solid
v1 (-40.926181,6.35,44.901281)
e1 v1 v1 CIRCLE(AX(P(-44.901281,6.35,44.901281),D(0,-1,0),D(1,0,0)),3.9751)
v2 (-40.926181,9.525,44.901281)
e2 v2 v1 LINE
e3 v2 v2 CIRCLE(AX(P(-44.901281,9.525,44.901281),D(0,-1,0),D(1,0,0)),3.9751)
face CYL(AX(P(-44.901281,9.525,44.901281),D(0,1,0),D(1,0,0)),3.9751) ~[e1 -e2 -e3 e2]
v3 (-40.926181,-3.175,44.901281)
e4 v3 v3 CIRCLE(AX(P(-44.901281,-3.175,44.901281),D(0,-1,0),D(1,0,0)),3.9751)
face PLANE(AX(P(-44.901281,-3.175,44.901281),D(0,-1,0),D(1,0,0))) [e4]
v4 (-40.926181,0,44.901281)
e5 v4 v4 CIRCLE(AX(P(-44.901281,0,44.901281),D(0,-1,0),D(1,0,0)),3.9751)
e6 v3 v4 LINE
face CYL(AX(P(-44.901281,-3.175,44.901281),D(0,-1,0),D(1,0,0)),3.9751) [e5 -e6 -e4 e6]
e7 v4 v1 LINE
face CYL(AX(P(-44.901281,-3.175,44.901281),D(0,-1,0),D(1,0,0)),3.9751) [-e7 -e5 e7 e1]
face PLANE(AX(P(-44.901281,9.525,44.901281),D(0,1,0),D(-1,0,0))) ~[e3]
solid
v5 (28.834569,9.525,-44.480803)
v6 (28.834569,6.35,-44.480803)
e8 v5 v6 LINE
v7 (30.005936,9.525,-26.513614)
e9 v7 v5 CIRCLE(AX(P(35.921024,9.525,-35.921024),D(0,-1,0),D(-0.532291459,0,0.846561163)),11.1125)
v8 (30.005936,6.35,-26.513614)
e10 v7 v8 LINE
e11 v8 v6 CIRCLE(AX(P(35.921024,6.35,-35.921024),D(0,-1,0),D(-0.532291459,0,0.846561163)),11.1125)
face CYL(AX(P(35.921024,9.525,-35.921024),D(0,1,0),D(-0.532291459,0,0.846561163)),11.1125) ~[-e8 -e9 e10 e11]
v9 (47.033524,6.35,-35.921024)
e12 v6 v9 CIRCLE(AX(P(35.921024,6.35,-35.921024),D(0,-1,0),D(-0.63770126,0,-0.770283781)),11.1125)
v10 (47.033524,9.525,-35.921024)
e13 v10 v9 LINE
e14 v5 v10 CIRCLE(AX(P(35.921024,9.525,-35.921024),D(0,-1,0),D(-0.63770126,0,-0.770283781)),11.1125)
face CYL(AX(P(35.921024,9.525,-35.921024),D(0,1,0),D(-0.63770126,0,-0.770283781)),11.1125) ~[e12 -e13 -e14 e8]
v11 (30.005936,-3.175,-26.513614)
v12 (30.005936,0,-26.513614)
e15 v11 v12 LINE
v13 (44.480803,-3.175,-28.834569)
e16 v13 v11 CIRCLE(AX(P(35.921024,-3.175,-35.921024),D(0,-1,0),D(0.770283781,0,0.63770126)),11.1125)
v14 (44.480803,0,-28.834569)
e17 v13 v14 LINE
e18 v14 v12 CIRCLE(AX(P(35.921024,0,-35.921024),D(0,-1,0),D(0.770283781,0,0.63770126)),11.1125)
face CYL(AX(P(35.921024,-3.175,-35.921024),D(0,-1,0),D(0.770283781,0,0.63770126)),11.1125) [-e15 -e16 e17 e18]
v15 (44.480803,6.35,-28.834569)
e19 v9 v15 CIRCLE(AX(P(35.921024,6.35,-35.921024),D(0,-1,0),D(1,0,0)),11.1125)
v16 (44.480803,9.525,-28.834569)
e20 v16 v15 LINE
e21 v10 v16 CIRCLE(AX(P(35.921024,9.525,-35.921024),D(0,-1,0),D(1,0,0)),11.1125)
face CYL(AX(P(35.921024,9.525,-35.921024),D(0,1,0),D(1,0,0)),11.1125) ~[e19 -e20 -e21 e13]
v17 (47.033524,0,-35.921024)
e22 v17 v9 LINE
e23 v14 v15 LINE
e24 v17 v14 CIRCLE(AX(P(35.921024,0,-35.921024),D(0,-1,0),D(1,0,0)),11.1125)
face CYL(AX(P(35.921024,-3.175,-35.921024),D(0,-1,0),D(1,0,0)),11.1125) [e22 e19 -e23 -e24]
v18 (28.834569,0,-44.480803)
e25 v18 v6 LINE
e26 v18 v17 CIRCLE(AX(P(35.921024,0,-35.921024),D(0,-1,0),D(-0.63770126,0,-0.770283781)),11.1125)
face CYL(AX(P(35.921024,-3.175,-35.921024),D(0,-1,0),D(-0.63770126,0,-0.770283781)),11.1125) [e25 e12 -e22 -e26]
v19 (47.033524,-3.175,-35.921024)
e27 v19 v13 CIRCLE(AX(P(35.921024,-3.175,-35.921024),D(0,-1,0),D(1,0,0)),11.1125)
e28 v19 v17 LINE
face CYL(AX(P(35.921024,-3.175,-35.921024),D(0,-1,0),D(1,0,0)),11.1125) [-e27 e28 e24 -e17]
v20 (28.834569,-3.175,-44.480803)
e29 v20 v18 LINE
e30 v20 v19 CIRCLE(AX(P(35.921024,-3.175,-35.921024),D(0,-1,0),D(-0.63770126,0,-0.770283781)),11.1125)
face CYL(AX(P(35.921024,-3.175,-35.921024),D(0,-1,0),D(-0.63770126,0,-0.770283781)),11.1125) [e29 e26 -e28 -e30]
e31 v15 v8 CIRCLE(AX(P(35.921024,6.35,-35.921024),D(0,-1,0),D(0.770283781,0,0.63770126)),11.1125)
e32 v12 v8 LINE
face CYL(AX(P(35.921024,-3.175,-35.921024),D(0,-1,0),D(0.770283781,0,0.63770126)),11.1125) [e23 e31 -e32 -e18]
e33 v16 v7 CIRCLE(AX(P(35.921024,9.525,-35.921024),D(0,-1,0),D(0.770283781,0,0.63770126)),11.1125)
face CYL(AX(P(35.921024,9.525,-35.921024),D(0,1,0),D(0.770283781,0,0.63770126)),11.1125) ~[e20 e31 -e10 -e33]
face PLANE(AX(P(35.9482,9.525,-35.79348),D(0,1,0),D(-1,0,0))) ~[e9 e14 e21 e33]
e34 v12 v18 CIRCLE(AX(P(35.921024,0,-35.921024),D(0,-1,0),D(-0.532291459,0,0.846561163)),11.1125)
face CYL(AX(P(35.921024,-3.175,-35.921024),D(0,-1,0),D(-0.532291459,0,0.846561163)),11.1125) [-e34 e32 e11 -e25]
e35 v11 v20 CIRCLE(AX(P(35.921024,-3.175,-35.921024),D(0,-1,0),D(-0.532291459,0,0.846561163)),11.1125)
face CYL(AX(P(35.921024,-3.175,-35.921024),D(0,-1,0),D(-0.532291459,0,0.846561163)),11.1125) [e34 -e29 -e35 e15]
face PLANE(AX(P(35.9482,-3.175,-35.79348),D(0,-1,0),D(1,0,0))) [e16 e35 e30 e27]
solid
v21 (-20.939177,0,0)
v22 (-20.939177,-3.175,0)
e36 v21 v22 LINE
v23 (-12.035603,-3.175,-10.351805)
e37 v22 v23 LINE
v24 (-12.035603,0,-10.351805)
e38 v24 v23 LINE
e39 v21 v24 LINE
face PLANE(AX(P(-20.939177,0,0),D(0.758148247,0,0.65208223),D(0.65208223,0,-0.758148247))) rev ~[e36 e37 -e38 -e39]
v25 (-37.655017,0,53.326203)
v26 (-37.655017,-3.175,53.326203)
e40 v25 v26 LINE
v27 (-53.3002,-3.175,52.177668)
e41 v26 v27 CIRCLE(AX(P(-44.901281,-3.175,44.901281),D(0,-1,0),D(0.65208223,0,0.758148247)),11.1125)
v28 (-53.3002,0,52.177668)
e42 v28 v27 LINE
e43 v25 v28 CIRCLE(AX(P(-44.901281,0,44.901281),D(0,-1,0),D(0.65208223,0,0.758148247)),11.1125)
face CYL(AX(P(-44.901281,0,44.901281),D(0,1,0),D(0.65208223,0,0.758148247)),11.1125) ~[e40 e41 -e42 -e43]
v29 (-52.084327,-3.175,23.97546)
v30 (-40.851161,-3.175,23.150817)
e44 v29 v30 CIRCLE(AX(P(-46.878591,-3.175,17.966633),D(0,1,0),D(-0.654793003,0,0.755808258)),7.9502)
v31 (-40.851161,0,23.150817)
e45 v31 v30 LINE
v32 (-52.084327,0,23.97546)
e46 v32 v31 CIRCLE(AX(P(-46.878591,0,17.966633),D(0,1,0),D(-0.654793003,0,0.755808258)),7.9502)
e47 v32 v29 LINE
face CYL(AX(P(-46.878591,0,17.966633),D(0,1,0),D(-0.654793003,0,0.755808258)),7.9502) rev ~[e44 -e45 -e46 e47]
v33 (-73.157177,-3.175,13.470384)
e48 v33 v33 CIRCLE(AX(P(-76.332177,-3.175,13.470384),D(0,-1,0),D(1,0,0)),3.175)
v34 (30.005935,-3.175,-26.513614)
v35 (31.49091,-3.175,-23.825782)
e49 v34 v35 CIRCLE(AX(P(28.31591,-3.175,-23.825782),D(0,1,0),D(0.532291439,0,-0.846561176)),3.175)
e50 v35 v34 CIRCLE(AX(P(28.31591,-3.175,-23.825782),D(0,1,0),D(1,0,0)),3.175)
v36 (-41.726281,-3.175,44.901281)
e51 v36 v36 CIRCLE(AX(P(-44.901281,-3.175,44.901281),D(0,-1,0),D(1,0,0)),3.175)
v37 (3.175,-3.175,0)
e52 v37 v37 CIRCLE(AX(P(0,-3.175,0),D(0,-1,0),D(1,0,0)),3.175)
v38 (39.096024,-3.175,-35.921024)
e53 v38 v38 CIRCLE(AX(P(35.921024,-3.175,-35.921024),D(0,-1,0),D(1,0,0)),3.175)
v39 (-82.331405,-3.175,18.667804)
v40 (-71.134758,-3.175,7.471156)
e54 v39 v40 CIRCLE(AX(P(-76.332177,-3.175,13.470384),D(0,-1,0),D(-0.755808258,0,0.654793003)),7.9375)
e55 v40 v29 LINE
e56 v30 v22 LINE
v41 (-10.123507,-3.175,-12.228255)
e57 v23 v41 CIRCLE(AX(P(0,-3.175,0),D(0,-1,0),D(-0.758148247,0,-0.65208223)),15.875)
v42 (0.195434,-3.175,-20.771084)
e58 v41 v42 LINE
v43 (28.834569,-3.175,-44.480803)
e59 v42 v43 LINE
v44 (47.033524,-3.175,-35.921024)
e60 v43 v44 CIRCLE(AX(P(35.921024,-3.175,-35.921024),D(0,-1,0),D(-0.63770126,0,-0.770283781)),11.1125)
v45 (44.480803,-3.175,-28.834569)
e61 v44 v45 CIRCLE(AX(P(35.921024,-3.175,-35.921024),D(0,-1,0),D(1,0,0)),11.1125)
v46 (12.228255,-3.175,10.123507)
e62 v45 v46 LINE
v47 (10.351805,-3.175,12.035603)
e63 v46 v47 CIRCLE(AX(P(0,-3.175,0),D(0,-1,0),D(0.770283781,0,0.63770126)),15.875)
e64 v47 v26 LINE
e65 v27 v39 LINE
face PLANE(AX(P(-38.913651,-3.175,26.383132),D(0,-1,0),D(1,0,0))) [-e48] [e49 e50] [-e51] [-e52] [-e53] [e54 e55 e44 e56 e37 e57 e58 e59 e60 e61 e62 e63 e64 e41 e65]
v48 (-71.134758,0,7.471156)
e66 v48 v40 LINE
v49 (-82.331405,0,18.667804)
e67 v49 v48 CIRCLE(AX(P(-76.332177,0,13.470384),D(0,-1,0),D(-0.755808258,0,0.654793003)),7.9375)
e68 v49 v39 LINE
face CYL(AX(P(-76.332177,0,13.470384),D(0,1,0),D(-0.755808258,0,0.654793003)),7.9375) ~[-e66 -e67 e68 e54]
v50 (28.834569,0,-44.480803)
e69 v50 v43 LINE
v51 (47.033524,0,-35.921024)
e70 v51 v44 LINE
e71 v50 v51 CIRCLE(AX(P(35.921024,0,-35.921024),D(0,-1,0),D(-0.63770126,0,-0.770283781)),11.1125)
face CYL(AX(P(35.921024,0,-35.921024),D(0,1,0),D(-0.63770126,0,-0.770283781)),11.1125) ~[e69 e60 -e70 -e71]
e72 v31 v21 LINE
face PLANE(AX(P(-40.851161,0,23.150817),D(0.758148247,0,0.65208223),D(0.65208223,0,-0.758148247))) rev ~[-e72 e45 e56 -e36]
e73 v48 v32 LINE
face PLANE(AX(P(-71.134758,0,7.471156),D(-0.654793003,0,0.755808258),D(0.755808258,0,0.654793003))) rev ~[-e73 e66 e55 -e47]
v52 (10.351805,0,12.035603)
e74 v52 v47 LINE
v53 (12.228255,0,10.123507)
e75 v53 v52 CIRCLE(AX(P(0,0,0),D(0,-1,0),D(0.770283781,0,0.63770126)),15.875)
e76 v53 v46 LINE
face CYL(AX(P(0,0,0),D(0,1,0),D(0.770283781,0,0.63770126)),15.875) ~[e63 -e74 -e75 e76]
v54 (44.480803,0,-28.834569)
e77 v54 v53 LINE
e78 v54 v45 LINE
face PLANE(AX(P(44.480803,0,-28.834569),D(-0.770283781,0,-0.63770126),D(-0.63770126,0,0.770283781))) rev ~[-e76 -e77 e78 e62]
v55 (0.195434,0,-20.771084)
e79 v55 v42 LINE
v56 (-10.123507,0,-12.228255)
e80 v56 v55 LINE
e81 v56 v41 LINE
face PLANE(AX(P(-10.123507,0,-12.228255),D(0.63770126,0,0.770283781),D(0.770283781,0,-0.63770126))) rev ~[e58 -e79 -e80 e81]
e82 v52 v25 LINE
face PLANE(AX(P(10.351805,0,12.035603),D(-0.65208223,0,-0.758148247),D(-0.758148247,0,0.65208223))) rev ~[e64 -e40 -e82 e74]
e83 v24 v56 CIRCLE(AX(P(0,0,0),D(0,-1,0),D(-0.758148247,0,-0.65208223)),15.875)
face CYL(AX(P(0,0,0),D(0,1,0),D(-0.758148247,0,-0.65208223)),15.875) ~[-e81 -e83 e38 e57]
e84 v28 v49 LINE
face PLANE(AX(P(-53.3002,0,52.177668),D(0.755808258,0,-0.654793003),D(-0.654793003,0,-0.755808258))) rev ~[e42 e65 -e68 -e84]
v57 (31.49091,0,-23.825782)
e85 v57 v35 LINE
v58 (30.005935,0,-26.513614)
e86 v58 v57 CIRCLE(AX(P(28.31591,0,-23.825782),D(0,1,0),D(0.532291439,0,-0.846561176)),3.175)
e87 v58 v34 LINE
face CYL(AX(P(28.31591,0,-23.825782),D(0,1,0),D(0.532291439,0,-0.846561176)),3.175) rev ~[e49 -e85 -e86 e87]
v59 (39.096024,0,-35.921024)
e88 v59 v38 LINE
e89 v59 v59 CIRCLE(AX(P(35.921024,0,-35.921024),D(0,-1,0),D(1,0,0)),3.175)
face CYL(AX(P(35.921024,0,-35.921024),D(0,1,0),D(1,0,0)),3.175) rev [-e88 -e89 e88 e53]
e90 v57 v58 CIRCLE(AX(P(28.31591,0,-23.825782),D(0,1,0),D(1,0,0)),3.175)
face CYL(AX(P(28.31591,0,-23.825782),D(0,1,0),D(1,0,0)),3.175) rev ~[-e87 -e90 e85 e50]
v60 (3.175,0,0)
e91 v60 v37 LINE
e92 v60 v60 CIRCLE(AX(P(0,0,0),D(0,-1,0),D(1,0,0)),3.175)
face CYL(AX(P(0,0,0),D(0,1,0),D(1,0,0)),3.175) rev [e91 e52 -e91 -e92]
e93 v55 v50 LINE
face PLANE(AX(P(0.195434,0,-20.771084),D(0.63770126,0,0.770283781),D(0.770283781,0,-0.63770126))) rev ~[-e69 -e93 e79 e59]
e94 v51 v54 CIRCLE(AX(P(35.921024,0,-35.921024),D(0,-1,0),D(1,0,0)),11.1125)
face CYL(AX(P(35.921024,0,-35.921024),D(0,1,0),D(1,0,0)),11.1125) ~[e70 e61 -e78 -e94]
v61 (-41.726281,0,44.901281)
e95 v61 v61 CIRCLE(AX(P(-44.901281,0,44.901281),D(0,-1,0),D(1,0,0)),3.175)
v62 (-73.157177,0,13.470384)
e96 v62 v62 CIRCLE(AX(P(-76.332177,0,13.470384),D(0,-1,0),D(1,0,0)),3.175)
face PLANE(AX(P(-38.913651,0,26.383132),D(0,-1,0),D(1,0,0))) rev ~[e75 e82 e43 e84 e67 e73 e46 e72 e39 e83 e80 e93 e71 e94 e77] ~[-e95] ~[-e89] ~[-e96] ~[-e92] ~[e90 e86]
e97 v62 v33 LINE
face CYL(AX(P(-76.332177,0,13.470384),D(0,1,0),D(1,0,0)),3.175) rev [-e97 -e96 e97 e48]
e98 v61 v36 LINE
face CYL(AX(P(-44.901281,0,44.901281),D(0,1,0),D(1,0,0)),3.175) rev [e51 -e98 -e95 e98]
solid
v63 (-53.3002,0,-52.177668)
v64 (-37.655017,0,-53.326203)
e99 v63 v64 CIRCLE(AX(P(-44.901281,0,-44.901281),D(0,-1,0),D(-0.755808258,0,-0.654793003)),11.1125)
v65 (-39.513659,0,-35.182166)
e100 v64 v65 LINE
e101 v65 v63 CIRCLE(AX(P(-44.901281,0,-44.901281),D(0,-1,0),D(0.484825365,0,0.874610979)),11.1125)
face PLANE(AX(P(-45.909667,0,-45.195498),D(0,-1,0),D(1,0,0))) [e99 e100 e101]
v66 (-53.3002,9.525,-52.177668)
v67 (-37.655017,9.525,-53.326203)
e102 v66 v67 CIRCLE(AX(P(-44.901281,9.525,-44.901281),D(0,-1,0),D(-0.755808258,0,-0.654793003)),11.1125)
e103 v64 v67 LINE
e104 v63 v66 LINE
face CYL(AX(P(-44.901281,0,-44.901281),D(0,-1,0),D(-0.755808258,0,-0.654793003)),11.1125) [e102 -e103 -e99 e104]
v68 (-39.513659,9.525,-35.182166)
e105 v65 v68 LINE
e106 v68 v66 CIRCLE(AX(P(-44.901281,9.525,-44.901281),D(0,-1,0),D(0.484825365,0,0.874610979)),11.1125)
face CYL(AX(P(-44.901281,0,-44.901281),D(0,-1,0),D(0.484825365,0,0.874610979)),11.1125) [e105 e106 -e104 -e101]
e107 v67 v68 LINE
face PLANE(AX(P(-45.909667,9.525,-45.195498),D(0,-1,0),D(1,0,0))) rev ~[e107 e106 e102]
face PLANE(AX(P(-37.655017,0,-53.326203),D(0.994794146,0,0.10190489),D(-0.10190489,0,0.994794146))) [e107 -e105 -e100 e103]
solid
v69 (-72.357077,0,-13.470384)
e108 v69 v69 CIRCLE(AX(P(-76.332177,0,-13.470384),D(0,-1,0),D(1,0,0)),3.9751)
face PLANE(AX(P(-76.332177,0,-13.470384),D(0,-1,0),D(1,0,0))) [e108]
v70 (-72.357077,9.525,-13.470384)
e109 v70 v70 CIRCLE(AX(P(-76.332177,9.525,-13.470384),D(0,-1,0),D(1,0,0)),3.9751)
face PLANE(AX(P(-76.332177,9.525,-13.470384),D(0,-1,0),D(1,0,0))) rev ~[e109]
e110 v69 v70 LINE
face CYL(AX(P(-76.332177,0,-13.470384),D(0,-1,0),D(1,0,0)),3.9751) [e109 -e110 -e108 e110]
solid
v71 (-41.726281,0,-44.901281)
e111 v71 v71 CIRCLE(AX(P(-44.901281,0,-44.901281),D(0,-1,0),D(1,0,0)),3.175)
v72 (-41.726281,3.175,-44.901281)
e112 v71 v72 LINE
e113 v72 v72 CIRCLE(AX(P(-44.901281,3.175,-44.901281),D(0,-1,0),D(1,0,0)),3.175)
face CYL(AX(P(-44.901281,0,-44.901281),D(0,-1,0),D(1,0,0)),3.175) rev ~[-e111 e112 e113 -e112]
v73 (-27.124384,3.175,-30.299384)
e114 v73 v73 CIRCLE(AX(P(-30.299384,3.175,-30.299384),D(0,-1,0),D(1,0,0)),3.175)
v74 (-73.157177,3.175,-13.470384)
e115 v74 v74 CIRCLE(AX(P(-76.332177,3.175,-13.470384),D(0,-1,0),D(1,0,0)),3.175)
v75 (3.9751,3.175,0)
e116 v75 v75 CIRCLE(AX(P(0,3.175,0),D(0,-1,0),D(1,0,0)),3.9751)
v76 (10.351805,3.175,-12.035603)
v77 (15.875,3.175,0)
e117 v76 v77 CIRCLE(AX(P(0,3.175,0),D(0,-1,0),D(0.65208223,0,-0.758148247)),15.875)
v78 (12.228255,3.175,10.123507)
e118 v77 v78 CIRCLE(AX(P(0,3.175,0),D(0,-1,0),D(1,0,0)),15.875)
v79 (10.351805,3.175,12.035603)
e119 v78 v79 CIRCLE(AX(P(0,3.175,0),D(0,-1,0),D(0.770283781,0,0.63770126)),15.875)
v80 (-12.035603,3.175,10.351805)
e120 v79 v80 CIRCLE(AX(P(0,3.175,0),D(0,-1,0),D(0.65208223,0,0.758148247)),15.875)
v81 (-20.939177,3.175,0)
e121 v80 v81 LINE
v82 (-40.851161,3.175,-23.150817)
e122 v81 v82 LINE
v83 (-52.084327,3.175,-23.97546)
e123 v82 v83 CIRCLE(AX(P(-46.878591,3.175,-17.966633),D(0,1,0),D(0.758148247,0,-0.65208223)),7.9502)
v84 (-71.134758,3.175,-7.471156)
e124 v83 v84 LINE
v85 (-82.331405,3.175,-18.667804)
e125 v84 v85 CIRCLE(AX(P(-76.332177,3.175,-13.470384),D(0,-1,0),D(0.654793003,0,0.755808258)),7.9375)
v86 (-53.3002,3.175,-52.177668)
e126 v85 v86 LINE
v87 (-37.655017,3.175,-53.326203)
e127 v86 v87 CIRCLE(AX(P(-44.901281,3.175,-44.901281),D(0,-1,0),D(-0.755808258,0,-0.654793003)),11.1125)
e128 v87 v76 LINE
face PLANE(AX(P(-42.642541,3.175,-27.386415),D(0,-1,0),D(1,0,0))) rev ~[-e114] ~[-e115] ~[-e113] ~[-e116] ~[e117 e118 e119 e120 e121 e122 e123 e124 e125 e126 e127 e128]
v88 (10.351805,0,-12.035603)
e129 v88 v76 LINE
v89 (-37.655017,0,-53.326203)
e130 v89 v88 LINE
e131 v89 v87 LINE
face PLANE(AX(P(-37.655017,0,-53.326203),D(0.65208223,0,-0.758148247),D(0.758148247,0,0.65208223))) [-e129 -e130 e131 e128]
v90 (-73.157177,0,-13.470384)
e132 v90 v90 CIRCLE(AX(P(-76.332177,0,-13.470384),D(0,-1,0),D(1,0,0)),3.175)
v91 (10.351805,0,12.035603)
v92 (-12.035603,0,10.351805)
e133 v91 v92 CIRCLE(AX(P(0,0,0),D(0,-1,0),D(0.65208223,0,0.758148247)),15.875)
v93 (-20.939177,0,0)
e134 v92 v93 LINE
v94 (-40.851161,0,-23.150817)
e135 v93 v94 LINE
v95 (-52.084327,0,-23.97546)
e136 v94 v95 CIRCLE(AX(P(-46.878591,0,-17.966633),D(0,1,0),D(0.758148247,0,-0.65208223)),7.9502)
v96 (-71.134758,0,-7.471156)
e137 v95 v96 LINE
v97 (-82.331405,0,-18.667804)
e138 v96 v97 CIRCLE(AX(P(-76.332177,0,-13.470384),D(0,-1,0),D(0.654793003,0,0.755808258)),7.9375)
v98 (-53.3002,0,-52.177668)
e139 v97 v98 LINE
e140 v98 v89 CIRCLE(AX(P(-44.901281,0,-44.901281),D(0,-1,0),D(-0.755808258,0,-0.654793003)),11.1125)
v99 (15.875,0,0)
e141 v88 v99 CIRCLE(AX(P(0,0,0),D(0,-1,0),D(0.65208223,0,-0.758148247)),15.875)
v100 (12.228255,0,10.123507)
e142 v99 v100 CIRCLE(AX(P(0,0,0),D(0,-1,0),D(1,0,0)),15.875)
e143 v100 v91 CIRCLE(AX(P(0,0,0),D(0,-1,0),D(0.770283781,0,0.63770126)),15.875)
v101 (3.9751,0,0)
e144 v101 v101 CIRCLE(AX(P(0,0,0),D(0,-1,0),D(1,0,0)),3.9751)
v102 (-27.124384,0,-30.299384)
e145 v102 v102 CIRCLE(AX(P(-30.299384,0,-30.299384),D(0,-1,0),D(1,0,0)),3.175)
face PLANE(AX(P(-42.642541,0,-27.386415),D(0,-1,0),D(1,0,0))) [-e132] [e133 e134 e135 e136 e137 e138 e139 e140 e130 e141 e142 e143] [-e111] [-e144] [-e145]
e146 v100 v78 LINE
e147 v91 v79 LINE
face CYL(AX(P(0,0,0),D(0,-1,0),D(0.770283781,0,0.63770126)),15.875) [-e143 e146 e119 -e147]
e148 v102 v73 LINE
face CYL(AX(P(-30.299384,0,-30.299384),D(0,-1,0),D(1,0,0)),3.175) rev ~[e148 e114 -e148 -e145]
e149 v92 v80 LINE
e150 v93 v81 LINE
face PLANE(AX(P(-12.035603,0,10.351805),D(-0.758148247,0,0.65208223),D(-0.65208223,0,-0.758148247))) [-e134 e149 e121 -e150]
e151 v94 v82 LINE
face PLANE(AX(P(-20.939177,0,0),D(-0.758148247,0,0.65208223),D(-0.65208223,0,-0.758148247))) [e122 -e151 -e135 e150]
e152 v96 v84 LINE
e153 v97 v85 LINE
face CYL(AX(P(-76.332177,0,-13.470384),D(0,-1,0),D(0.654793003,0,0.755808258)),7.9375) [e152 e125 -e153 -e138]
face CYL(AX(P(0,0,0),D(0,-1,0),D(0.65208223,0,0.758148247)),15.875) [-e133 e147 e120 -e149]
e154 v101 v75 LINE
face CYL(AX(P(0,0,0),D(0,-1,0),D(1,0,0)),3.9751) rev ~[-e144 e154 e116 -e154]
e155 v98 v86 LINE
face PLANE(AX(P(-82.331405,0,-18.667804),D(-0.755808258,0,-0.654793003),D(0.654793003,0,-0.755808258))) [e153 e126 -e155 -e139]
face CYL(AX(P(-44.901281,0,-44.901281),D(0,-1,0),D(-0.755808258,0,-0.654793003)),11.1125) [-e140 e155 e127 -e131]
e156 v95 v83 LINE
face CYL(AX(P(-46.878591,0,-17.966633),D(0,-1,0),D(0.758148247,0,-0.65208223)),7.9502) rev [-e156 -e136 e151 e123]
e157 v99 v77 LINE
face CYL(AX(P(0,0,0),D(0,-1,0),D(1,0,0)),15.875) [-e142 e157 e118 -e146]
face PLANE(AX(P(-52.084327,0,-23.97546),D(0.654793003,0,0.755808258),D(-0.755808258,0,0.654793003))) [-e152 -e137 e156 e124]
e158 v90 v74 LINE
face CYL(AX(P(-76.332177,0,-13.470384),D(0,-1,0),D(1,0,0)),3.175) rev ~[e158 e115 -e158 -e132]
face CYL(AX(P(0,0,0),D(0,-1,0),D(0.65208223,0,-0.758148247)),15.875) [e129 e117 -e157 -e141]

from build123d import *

# Parameters (mm, degrees)
F0_R     = 3.175
F0_R_2   = 3.9751
F1_DEPTH = 3.175
F2_DEPTH = 3.175
F4_R     = 3.175
F6_DEPTH = 9.525
F4_R_2   = 3.9751
F3_R     = 3.175
F3_R_2   = 3.9751


# Not quite as in the source:
# - a pattern or mirror of a feature is missing from the dataset's text; its kind, count and spacing are read off the source's solid


with BuildPart() as f1:
    # F0 (on Front) → F1 (new body)
    with BuildSketch(Plane.XZ):
        with BuildLine():
            ThreePointArc((-12.0356034274, 10.3518054047), (-1.190625, 15.8302885984), (10.3518054047, 12.0356034274))
            Line((10.3518054047, 12.0356034274), (-37.655016822, 53.3262030046))
            ThreePointArc((-37.655016822, 53.3262030046), (-34.8014845049, 49.5361241819), (-33.7887806053, 44.9012806053))
            ThreePointArc((-33.7887806053, 44.9012806053), (-48.7842347585, 34.4892527868), (-53.300199871, 52.1776678558))
            Line((-53.300199871, 52.1776678558), (-82.331405076, 18.6678036462))
            ThreePointArc((-82.331405076, 18.6678036462), (-73.5586383483, 20.9075469092), (-68.3946770291, 13.4703841816))
            ThreePointArc((-68.3946770291, 13.4703841816), (-69.1121208226, 10.1727039932), (-71.1347575644, 7.4711561347))
            Line((-71.1347575644, 7.4711561347), (-52.0843267669, 23.9754595323))
            ThreePointArc((-52.0843267669, 23.9754595323), (-46.2965222838, 25.8954961667), (-40.8511612346, 23.1508168672))
            Line((-40.8511612346, 23.1508168672), (-20.9391765456, 0))
            Line((-20.9391765456, 0), (-12.0356034274, 10.3518054047))
        make_face()
        with BuildLine():
            ThreePointArc((-68.3946770291, 13.4703841816), (-73.5586383483, 20.9075469092), (-82.331405076, 18.6678036462))
            ThreePointArc((-82.331405076, 18.6678036462), (-81.9448371048, 7.8577241059), (-71.1347575644, 7.4711561347))
            ThreePointArc((-71.1347575644, 7.4711561347), (-69.1121208226, 10.1727039932), (-68.3946770291, 13.4703841816))
        make_face()
        with Locations((-76.3321770291, 13.4703841816)):
            Circle(F0_R, mode=Mode.SUBTRACT)
        with BuildLine():
            ThreePointArc((-33.7887806053, 44.9012806053), (-34.8014845049, 49.5361241819), (-37.655016822, 53.3262030046))
            ThreePointArc((-37.655016822, 53.3262030046), (-45.7148756595, 55.9839571475), (-53.300199871, 52.1776678558))
            ThreePointArc((-53.300199871, 52.1776678558), (-48.7842347585, 34.4892527868), (-33.7887806053, 44.9012806053))
        make_face()
        with Locations((-44.9012806053, 44.9012806053)):
            Circle(F0_R, mode=Mode.SUBTRACT)
        with BuildLine():
            ThreePointArc((10.3518054047, -12.0356034274), (14.4282801435, -6.6212051093), (15.875, 0))
            ThreePointArc((15.875, 0), (14.9355142785, 5.3801522504), (12.2282550252, 10.1235074968))
            ThreePointArc((12.2282550252, 10.1235074968), (11.3304373246, 11.1192092809), (10.3518054047, 12.0356034274))
            ThreePointArc((10.3518054047, 12.0356034274), (-1.190625, 15.8302885984), (-12.0356034274, 10.3518054047))
            ThreePointArc((-12.0356034274, 10.3518054047), (-15.875, 0), (-12.0356034274, -10.3518054047))
            ThreePointArc((-12.0356034274, -10.3518054047), (-11.1192092809, -11.3304373246), (-10.1235074968, -12.2282550252))
            ThreePointArc((-10.1235074968, -12.2282550252), (0.1493607821, -15.87429735), (10.3518054047, -12.0356034274))
        make_face()
        Circle(F0_R_2, mode=Mode.SUBTRACT)
        with BuildLine():
            Line((0.1954344954, -20.7710836138), (10.3518054047, -12.0356034274))
            ThreePointArc((10.3518054047, -12.0356034274), (0.1493607821, -15.87429735), (-10.1235074968, -12.2282550252))
            Line((-10.1235074968, -12.2282550252), (0.1954344954, -20.7710836138))
        make_face()
        with BuildLine():
            ThreePointArc((-12.0356034274, -10.3518054047), (-15.875, 0), (-12.0356034274, 10.3518054047))
            Line((-12.0356034274, 10.3518054047), (-20.9391765456, 0))
            Line((-20.9391765456, 0), (-12.0356034274, -10.3518054047))
        make_face()
        with BuildLine():
            ThreePointArc((12.2282550252, 10.1235074968), (14.9355142785, 5.3801522504), (15.875, 0))
            ThreePointArc((15.875, 0), (14.4282801435, -6.6212051093), (10.3518054047, -12.0356034274))
            Line((10.3518054047, -12.0356034274), (0.1954344954, -20.7710836138))
            Line((0.1954344954, -20.7710836138), (28.8345692365, -44.4808030019))
            ThreePointArc((28.8345692365, -44.4808030019), (24.8320654939, -35.1980827435), (30.0059353765, -26.5136137301))
            ThreePointArc((30.0059353765, -26.5136137301), (37.6803721288, -24.9486796066), (44.4808030019, -28.8345692365))
            Line((44.4808030019, -28.8345692365), (12.2282550252, 10.1235074968))
        make_face()
        with BuildLine():
            ThreePointArc((31.490910058, -23.8257819975), (31.0949796313, -25.361163809), (30.0059353765, -26.5136137301))
            ThreePointArc((30.0059353765, -26.5136137301), (25.5368404848, -22.290400186), (31.490910058, -23.8257819975))
        make_face(mode=Mode.SUBTRACT)
        with BuildLine():
            ThreePointArc((47.0335244843, -35.9210244843), (46.3758844792, -32.154917909), (44.4808030019, -28.8345692365))
            ThreePointArc((44.4808030019, -28.8345692365), (37.6803721288, -24.9486796066), (30.0059353765, -26.5136137301))
            ThreePointArc((30.0059353765, -26.5136137301), (24.8320654939, -35.1980827435), (28.8345692365, -44.4808030019))
            ThreePointArc((28.8345692365, -44.4808030019), (40.650687385, -45.9767663811), (47.0335244843, -35.9210244843))
        make_face()
        with Locations((35.9210244843, -35.9210244843)):
            Circle(F0_R, mode=Mode.SUBTRACT)
        Circle(F0_R_2)
        Circle(F0_R, mode=Mode.SUBTRACT)
    extrude(amount=F1_DEPTH)


with BuildPart() as f2:
    # F0 (on Front) → F2 (new body)
    with BuildSketch(Plane.XZ):
        with BuildLine():
            Line((0.1954344954, -20.7710836138), (-10.1235074968, -12.2282550252))
            ThreePointArc((-10.1235074968, -12.2282550252), (-11.1192092809, -11.3304373246), (-12.0356034274, -10.3518054047))
            Line((-12.0356034274, -10.3518054047), (-20.9391765456, 0))
            Line((-20.9391765456, 0), (-40.8511612346, -23.1508168672))
            ThreePointArc((-40.8511612346, -23.1508168672), (-46.2965222838, -25.8954961667), (-52.0843267669, -23.9754595323))
            Line((-52.0843267669, -23.9754595323), (-71.1347575644, -7.4711561347))
            ThreePointArc((-71.1347575644, -7.4711561347), (-69.1121208226, -10.1727039932), (-68.3946770291, -13.4703841816))
            ThreePointArc((-68.3946770291, -13.4703841816), (-73.5586383483, -20.9075469092), (-82.331405076, -18.6678036462))
            Line((-82.331405076, -18.6678036462), (-53.300199871, -52.1776678558))
            ThreePointArc((-53.300199871, -52.1776678558), (-48.7842347585, -34.4892527868), (-33.7887806053, -44.9012806053))
            ThreePointArc((-33.7887806053, -44.9012806053), (-34.8014845049, -49.5361241819), (-37.655016822, -53.3262030046))
            Line((-37.655016822, -53.3262030046), (0.1954344954, -20.7710836138))
        make_face()
        with Locations((-30.2993841525, -30.2993841525)):
            Circle(F0_R, mode=Mode.SUBTRACT)
        with BuildLine():
            ThreePointArc((-53.300199871, -52.1776678558), (-45.7148756595, -55.9839571475), (-37.655016822, -53.3262030046))
            ThreePointArc((-37.655016822, -53.3262030046), (-34.8014845049, -49.5361241819), (-33.7887806053, -44.9012806053))
            ThreePointArc((-33.7887806053, -44.9012806053), (-48.7842347585, -34.4892527868), (-53.300199871, -52.1776678558))
        make_face()
        with Locations((-44.9012806053, -44.9012806053)):
            Circle(F0_R, mode=Mode.SUBTRACT)
        with BuildLine():
            ThreePointArc((-71.1347575644, -7.4711561347), (-81.9448371048, -7.8577241059), (-82.331405076, -18.6678036462))
            ThreePointArc((-82.331405076, -18.6678036462), (-73.5586383483, -20.9075469092), (-68.3946770291, -13.4703841816))
            ThreePointArc((-68.3946770291, -13.4703841816), (-69.1121208226, -10.1727039932), (-71.1347575644, -7.4711561347))
        make_face()
        with Locations((-76.3321770291, -13.4703841816)):
            Circle(F0_R, mode=Mode.SUBTRACT)
        with BuildLine():
            ThreePointArc((-12.0356034274, -10.3518054047), (-15.875, 0), (-12.0356034274, 10.3518054047))
            Line((-12.0356034274, 10.3518054047), (-20.9391765456, 0))
            Line((-20.9391765456, 0), (-12.0356034274, -10.3518054047))
        make_face()
        with BuildLine():
            Line((0.1954344954, -20.7710836138), (10.3518054047, -12.0356034274))
            ThreePointArc((10.3518054047, -12.0356034274), (0.1493607821, -15.87429735), (-10.1235074968, -12.2282550252))
            Line((-10.1235074968, -12.2282550252), (0.1954344954, -20.7710836138))
        make_face()
        with BuildLine():
            ThreePointArc((10.3518054047, -12.0356034274), (14.4282801435, -6.6212051093), (15.875, 0))
            ThreePointArc((15.875, 0), (14.9355142785, 5.3801522504), (12.2282550252, 10.1235074968))
            ThreePointArc((12.2282550252, 10.1235074968), (11.3304373246, 11.1192092809), (10.3518054047, 12.0356034274))
            ThreePointArc((10.3518054047, 12.0356034274), (-1.190625, 15.8302885984), (-12.0356034274, 10.3518054047))
            ThreePointArc((-12.0356034274, 10.3518054047), (-15.875, 0), (-12.0356034274, -10.3518054047))
            ThreePointArc((-12.0356034274, -10.3518054047), (-11.1192092809, -11.3304373246), (-10.1235074968, -12.2282550252))
            ThreePointArc((-10.1235074968, -12.2282550252), (0.1493607821, -15.87429735), (10.3518054047, -12.0356034274))
        make_face()
        Circle(F0_R_2, mode=Mode.SUBTRACT)
    extrude(amount=-F2_DEPTH)


with BuildPart() as f6:
    # F4 (on face) → F6 (new body, through all)
    with BuildSketch(Plane.XZ):
        with BuildLine():
            Line((-37.655016822, -53.3262030046), (-39.5136587319, -35.1821660984))
            ThreePointArc((-39.5136587319, -35.1821660984), (-53.5313876726, -37.9006443302), (-53.300199871, -52.1776678558))
            ThreePointArc((-53.300199871, -52.1776678558), (-45.7148756595, -55.9839571475), (-37.655016822, -53.3262030046))
        make_face()
        with Locations((-44.9012806053, -44.9012806053)):
            Circle(F4_R, mode=Mode.SUBTRACT)
        with Locations((-44.9012806053, -44.9012806053)):
            Circle(F4_R)
    extrude(amount=-F6_DEPTH)


with BuildPart() as f6b:
    # F4 (on face) → F6, piece 2 (new body, through all)
    with BuildSketch(Plane.XZ):
        with Locations((-76.3321770291, -13.4703841816)):
            Circle(F4_R_2)
        with Locations((-76.3321770291, -13.4703841816)):
            Circle(F4_R, mode=Mode.SUBTRACT)
        with Locations((-76.3321770291, -13.4703841816)):
            Circle(F4_R)
    extrude(amount=-F6_DEPTH)


with BuildPart() as f6c:
    # F3 (on face) → F6, piece 3 (new body, through all)
    with BuildSketch(Plane.XZ.offset(3.175)):
        with BuildLine():
            ThreePointArc((28.8345692365, -44.4808030019), (40.650687385, -45.9767663811), (47.0335244843, -35.9210244843))
            ThreePointArc((47.0335244843, -35.9210244843), (46.3758844792, -32.154917909), (44.4808030019, -28.8345692365))
            ThreePointArc((44.4808030019, -28.8345692365), (37.6803722871, -24.9486796319), (30.005935648, -26.5136135595))
            ThreePointArc((30.005935648, -26.5136135595), (24.8320655044, -35.1980825835), (28.8345692365, -44.4808030019))
        make_face()
        with Locations((35.9210244843, -35.9210244843)):
            Circle(F3_R, mode=Mode.SUBTRACT)
        with Locations((35.9210244843, -35.9210244843)):
            Circle(F3_R)
    extrude(amount=-F6_DEPTH)

    # F6_3_copies: F6c across plane


with BuildPart() as f6d:
    # F3 (on face) → F6, piece 4 (new body, through all)
    with BuildSketch(Plane.XZ.offset(3.175)):
        with Locations((-44.9012806053, 44.9012806053)):
            Circle(F3_R_2)
        with Locations((-44.9012806053, 44.9012806053)):
            Circle(F3_R, mode=Mode.SUBTRACT)
        with Locations((-44.9012806053, 44.9012806053)):
            Circle(F3_R)
    extrude(amount=-F6_DEPTH)

    # F6_4_copies: F6d across plane


with BuildPart() as f6c_1:
    add(f6c.part)
    add(f6c.part.mirror(Plane.ZX.offset(3.175)))


with BuildPart() as f6d_1:
    add(f6d.part)
    add(f6d.part.mirror(Plane.ZX.offset(3.175)))


solid = Compound([f1.part, f2.part, f6.part, f6b.part, f6c_1.part, f6d_1.part])
